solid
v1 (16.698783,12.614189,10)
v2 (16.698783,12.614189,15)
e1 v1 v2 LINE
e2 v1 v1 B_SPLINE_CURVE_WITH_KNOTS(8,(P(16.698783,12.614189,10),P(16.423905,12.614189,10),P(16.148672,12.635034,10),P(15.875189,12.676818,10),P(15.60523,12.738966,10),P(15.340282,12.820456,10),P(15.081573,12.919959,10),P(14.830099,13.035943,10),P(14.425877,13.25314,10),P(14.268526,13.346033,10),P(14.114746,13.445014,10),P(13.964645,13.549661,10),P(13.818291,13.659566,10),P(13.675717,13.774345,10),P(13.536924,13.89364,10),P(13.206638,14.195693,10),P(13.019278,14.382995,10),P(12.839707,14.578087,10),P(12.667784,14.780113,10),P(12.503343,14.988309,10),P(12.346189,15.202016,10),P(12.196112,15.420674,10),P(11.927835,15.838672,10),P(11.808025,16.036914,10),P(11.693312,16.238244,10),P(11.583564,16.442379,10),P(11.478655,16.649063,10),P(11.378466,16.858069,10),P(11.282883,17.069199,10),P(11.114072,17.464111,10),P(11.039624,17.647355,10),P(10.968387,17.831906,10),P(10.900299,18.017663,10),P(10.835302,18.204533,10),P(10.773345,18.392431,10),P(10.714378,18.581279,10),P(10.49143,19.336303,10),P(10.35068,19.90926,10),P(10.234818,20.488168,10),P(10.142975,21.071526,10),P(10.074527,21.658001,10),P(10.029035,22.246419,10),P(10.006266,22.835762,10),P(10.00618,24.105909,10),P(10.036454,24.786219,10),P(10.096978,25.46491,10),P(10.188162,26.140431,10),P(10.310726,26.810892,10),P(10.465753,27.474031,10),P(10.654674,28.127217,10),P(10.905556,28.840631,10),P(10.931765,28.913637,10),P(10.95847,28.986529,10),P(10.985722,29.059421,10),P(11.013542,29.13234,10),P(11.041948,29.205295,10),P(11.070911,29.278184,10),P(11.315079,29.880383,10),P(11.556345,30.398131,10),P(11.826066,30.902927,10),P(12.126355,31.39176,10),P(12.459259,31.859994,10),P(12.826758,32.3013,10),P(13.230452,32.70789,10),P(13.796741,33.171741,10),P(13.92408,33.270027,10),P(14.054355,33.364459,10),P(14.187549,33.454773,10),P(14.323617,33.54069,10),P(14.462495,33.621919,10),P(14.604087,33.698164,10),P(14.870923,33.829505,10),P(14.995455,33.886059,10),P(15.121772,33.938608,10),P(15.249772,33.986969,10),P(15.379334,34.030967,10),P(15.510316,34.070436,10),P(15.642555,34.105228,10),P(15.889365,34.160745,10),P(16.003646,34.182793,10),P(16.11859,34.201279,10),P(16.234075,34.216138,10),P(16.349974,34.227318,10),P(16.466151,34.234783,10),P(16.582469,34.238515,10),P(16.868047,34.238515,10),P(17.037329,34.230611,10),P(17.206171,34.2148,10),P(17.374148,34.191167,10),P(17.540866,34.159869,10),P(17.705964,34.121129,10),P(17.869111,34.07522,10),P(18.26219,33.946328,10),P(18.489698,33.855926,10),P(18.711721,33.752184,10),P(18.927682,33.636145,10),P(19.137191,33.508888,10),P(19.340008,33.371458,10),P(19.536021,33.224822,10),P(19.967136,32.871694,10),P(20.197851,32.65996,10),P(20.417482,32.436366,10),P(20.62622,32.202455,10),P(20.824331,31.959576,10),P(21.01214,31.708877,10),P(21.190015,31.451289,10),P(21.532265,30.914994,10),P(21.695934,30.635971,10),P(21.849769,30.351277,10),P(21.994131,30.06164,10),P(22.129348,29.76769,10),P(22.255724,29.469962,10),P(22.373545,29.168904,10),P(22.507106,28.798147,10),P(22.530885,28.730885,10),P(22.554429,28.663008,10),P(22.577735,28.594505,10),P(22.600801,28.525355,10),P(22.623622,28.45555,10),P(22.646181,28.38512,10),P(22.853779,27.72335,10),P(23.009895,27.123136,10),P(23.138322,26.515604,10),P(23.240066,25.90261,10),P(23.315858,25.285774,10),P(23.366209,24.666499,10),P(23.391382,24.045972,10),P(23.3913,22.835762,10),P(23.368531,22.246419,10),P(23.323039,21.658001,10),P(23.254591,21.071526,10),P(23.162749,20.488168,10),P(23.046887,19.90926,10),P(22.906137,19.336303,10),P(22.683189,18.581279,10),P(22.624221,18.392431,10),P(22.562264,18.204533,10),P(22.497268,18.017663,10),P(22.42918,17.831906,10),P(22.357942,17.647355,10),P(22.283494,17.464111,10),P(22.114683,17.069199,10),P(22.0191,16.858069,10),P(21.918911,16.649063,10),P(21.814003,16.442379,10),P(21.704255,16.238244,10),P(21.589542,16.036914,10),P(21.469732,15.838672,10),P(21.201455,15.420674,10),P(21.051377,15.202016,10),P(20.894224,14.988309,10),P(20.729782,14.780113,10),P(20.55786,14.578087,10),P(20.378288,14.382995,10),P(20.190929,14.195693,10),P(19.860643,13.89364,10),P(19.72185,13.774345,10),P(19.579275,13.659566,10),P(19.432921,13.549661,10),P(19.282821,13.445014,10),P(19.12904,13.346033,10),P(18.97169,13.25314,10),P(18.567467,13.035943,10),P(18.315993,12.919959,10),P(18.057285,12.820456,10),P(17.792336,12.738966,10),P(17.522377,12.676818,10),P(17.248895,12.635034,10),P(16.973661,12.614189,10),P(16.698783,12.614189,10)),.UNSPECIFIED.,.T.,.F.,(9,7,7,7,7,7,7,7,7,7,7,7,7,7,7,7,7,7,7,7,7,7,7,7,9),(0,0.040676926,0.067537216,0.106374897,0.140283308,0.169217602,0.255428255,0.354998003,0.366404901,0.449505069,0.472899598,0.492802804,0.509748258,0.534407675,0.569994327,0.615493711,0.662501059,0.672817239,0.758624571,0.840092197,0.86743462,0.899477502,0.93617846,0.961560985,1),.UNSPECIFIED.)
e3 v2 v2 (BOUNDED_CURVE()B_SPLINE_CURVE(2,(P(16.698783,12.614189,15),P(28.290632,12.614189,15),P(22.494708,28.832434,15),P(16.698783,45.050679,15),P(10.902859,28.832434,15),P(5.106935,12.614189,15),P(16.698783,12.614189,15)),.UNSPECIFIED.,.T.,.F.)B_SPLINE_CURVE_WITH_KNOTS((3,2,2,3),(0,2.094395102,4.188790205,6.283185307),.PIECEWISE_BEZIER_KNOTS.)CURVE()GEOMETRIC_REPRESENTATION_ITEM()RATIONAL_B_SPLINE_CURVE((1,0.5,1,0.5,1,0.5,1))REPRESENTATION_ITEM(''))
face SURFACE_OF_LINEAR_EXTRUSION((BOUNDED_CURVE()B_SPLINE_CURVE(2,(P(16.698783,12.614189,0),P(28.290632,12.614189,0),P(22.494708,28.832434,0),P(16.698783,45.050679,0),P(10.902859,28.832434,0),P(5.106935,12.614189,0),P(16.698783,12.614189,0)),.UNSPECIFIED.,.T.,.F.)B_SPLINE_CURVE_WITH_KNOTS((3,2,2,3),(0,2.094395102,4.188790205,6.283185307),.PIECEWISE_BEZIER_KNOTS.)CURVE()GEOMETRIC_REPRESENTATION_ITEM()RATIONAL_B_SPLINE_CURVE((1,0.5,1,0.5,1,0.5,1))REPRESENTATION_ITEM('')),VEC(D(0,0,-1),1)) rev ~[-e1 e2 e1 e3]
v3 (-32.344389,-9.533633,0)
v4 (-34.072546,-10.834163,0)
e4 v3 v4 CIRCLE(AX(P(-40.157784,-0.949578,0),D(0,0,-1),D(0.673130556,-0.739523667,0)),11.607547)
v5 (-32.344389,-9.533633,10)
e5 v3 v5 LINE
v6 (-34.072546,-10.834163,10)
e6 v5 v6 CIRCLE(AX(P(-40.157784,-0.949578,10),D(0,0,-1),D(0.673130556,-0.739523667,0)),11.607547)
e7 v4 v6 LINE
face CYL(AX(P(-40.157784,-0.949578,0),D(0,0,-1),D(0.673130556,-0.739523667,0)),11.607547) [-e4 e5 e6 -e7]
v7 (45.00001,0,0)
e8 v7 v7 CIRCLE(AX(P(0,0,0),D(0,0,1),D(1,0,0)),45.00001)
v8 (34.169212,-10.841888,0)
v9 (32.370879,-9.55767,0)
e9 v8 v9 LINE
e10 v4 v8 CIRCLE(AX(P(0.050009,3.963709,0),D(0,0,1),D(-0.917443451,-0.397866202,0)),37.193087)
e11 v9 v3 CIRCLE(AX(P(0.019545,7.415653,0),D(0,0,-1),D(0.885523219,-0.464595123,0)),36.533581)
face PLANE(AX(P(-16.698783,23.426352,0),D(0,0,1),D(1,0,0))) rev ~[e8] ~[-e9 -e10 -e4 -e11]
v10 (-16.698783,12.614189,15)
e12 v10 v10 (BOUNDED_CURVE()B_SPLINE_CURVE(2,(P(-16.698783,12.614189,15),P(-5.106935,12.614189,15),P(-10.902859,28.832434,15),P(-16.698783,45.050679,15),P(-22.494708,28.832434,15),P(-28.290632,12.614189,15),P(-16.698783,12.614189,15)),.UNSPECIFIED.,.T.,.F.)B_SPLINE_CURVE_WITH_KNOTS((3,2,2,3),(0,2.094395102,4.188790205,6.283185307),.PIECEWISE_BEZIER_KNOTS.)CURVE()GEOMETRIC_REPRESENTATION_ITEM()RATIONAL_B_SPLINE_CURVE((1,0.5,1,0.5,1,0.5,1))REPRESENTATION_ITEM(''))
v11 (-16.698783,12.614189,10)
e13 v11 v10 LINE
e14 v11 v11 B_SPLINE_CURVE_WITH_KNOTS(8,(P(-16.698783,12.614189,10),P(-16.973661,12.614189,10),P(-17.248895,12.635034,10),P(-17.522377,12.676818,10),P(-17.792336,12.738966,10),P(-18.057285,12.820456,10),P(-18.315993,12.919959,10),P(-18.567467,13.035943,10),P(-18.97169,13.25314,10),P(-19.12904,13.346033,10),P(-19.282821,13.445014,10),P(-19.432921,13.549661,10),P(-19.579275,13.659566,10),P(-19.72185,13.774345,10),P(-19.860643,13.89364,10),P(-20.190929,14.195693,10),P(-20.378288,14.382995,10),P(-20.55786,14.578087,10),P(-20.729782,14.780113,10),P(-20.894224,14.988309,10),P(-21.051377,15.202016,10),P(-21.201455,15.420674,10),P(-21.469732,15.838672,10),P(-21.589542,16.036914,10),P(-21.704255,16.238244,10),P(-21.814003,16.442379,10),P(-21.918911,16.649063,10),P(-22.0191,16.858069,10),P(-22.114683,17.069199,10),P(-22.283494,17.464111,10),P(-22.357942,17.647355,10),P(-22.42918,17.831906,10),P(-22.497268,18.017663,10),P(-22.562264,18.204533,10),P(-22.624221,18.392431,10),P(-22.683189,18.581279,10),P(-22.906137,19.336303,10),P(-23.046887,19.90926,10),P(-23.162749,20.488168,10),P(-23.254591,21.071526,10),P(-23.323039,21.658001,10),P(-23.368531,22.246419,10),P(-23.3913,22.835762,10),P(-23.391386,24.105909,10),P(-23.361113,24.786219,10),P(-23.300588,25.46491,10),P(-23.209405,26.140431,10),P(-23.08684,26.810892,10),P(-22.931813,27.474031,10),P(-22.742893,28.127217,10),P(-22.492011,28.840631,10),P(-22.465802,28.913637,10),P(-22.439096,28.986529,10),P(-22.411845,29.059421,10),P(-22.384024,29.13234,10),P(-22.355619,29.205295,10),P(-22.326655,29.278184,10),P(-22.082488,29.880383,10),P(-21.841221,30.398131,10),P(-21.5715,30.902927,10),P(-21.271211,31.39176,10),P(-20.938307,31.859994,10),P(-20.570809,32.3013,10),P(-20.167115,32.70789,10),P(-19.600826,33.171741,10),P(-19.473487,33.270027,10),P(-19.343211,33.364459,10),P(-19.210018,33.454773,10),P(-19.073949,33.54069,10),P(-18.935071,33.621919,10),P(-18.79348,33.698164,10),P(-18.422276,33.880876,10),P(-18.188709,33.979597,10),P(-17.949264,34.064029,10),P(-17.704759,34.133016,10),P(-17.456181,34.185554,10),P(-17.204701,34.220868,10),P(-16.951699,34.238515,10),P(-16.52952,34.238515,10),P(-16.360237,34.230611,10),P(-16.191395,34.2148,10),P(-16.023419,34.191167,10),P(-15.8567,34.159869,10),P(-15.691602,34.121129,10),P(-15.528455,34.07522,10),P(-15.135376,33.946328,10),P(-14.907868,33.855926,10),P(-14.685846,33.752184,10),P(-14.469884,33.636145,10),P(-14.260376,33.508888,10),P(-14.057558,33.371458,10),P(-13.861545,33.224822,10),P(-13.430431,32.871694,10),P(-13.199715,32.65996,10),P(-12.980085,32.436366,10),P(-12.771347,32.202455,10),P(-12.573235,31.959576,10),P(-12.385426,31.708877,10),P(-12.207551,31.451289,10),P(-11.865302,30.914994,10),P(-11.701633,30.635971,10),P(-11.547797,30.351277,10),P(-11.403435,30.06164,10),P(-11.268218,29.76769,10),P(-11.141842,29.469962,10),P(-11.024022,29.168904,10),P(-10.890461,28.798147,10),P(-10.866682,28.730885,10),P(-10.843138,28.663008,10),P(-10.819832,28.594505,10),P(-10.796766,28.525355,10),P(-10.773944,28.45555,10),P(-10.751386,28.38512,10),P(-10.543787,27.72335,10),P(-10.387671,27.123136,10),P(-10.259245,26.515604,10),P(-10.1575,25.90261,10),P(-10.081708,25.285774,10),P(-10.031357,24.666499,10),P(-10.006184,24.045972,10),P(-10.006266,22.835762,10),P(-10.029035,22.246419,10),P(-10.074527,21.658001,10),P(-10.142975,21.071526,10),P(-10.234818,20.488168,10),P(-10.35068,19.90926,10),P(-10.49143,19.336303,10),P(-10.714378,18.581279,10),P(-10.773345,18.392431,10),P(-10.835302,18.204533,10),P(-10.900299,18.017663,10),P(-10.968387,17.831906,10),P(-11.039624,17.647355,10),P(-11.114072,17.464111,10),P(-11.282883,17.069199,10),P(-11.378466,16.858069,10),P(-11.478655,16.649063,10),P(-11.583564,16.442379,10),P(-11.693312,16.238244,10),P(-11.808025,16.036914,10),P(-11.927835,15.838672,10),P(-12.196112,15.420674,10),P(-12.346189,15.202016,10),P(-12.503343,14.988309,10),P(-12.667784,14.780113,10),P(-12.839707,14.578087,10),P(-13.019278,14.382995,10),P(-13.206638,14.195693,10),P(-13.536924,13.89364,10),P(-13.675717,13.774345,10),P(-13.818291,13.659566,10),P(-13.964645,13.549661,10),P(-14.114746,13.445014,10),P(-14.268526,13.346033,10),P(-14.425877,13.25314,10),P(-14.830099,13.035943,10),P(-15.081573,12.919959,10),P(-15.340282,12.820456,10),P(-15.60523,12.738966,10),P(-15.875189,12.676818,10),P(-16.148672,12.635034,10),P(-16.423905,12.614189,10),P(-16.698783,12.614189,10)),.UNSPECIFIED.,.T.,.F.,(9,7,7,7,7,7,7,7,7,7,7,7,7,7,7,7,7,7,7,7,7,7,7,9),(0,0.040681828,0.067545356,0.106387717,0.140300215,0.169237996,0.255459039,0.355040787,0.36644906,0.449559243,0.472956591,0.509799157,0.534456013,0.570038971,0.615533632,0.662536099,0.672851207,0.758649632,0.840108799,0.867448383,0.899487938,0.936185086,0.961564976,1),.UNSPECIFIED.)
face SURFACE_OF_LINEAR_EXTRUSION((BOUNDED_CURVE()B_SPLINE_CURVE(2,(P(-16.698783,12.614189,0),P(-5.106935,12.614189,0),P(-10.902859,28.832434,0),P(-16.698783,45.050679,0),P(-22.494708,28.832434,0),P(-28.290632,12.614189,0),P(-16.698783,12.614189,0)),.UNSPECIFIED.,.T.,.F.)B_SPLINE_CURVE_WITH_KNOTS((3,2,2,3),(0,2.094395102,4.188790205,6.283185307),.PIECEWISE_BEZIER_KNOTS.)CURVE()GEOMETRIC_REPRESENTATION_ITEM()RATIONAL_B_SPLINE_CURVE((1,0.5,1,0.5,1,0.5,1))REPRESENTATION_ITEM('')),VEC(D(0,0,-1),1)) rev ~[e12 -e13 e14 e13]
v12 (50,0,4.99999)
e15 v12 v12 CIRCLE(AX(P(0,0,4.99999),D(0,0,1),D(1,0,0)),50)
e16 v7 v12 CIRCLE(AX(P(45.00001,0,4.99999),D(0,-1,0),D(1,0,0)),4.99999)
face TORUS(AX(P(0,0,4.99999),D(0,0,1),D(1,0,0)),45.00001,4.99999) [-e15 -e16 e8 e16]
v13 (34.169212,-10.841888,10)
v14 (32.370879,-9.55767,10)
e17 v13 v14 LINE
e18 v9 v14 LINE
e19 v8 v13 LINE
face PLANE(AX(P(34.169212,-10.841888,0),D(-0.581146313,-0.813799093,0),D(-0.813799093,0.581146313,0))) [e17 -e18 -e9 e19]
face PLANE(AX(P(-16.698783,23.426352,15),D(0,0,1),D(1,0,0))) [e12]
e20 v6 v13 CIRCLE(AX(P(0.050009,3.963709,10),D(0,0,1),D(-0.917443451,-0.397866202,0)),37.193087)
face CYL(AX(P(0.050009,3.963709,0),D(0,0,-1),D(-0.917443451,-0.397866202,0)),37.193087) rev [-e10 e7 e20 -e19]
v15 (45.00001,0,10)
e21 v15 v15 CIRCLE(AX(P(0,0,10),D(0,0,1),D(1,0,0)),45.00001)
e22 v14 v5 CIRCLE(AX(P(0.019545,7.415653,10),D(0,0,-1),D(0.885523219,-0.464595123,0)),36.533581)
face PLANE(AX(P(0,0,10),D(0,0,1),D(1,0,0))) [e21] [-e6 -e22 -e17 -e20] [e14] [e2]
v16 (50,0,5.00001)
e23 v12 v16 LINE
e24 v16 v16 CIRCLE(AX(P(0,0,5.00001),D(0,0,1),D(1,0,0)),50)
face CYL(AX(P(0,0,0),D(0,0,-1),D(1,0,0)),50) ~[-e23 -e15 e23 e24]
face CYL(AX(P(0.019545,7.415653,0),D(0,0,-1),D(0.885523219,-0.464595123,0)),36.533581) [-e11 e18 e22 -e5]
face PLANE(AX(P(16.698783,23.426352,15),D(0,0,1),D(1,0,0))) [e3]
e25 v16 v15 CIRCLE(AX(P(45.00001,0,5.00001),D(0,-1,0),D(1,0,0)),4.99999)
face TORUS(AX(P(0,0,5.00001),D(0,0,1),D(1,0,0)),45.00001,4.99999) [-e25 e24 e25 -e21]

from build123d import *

# Parameters (mm, degrees)
F1_R     = 50
F3_DEPTH = 10
F4_DEPTH = 10
F5_DEPTH = 15
F6_R     = 4.99999


# Not quite as in the source:
# - a fillet or chamfer is up to 0.001 mm smaller than in the source, because OpenCascade refuses the exact size


with BuildPart() as f3:
    # F1 (on Top) → F3 (new body)
    with BuildSketch(Plane.XY):
        Circle(F1_R)
    extrude(amount=F3_DEPTH)

    # F2 (on Top) → F4 (cut, through all)
    with BuildSketch(Plane.XY):
        with BuildLine():
            ThreePointArc((-32.3443888766, -9.5336334546), (-33.1781101303, -10.2242371738), (-34.0725456744, -10.8341631392))
            ThreePointArc((-34.0725456744, -10.8341631392), (0.0457985584, -33.2293777169), (34.1692118563, -10.8418875925))
            Line((34.1692118563, -10.8418875925), (32.3708786214, -9.5576704707))
            ThreePointArc((32.3708786214, -9.5576704707), (0.0059751961, -29.1179251405), (-32.3443888766, -9.5336334546))
        make_face()
    extrude(amount=F4_DEPTH, mode=Mode.SUBTRACT)

    # F0 (on Top) → F5 (join)
    with BuildSketch(Plane.XY):
        with BuildLine():
            add(Edge.make_bspline(
                [(-16.6987832636, 12.6141887158), (-5.1069345829, 12.6141887158), (-10.9028589232, 28.8324337453), (-16.6987832636, 45.0506787747), (-22.4947076039, 28.8324337453), (-28.2906319443, 12.6141887158), (-16.6987832636, 12.6141887158)],
                knots=[0, 0, 0, 2.0943951024, 2.0943951024, 4.1887902048, 4.1887902048, 6.2831853072, 6.2831853072, 6.2831853072], degree=2, weights=[1, 0.5, 1, 0.5, 1, 0.5, 1]))
        make_face()
        with BuildLine():
            add(Edge.make_bspline(
                [(16.6987832636, 12.6141887158), (28.2906319443, 12.6141887158), (22.4947076039, 28.8324337453), (16.6987832636, 45.0506787747), (10.9028589232, 28.8324337453), (5.1069345829, 12.6141887158), (16.6987832636, 12.6141887158)],
                knots=[0, 0, 0, 2.0943951024, 2.0943951024, 4.1887902048, 4.1887902048, 6.2831853072, 6.2831853072, 6.2831853072], degree=2, weights=[1, 0.5, 1, 0.5, 1, 0.5, 1]))
        make_face()
    extrude(amount=F5_DEPTH)

    # F6 (radius 5 in the source; OpenCascade refuses exactly that, so slightly less here)
    f6_edges = [f3.edges().sort_by_distance(p)[0] for p in [
        (-50, 0, 10),
        (-50, 0, 0),
    ]]
    fillet(f6_edges, radius=F6_R)


solid = f3.part
